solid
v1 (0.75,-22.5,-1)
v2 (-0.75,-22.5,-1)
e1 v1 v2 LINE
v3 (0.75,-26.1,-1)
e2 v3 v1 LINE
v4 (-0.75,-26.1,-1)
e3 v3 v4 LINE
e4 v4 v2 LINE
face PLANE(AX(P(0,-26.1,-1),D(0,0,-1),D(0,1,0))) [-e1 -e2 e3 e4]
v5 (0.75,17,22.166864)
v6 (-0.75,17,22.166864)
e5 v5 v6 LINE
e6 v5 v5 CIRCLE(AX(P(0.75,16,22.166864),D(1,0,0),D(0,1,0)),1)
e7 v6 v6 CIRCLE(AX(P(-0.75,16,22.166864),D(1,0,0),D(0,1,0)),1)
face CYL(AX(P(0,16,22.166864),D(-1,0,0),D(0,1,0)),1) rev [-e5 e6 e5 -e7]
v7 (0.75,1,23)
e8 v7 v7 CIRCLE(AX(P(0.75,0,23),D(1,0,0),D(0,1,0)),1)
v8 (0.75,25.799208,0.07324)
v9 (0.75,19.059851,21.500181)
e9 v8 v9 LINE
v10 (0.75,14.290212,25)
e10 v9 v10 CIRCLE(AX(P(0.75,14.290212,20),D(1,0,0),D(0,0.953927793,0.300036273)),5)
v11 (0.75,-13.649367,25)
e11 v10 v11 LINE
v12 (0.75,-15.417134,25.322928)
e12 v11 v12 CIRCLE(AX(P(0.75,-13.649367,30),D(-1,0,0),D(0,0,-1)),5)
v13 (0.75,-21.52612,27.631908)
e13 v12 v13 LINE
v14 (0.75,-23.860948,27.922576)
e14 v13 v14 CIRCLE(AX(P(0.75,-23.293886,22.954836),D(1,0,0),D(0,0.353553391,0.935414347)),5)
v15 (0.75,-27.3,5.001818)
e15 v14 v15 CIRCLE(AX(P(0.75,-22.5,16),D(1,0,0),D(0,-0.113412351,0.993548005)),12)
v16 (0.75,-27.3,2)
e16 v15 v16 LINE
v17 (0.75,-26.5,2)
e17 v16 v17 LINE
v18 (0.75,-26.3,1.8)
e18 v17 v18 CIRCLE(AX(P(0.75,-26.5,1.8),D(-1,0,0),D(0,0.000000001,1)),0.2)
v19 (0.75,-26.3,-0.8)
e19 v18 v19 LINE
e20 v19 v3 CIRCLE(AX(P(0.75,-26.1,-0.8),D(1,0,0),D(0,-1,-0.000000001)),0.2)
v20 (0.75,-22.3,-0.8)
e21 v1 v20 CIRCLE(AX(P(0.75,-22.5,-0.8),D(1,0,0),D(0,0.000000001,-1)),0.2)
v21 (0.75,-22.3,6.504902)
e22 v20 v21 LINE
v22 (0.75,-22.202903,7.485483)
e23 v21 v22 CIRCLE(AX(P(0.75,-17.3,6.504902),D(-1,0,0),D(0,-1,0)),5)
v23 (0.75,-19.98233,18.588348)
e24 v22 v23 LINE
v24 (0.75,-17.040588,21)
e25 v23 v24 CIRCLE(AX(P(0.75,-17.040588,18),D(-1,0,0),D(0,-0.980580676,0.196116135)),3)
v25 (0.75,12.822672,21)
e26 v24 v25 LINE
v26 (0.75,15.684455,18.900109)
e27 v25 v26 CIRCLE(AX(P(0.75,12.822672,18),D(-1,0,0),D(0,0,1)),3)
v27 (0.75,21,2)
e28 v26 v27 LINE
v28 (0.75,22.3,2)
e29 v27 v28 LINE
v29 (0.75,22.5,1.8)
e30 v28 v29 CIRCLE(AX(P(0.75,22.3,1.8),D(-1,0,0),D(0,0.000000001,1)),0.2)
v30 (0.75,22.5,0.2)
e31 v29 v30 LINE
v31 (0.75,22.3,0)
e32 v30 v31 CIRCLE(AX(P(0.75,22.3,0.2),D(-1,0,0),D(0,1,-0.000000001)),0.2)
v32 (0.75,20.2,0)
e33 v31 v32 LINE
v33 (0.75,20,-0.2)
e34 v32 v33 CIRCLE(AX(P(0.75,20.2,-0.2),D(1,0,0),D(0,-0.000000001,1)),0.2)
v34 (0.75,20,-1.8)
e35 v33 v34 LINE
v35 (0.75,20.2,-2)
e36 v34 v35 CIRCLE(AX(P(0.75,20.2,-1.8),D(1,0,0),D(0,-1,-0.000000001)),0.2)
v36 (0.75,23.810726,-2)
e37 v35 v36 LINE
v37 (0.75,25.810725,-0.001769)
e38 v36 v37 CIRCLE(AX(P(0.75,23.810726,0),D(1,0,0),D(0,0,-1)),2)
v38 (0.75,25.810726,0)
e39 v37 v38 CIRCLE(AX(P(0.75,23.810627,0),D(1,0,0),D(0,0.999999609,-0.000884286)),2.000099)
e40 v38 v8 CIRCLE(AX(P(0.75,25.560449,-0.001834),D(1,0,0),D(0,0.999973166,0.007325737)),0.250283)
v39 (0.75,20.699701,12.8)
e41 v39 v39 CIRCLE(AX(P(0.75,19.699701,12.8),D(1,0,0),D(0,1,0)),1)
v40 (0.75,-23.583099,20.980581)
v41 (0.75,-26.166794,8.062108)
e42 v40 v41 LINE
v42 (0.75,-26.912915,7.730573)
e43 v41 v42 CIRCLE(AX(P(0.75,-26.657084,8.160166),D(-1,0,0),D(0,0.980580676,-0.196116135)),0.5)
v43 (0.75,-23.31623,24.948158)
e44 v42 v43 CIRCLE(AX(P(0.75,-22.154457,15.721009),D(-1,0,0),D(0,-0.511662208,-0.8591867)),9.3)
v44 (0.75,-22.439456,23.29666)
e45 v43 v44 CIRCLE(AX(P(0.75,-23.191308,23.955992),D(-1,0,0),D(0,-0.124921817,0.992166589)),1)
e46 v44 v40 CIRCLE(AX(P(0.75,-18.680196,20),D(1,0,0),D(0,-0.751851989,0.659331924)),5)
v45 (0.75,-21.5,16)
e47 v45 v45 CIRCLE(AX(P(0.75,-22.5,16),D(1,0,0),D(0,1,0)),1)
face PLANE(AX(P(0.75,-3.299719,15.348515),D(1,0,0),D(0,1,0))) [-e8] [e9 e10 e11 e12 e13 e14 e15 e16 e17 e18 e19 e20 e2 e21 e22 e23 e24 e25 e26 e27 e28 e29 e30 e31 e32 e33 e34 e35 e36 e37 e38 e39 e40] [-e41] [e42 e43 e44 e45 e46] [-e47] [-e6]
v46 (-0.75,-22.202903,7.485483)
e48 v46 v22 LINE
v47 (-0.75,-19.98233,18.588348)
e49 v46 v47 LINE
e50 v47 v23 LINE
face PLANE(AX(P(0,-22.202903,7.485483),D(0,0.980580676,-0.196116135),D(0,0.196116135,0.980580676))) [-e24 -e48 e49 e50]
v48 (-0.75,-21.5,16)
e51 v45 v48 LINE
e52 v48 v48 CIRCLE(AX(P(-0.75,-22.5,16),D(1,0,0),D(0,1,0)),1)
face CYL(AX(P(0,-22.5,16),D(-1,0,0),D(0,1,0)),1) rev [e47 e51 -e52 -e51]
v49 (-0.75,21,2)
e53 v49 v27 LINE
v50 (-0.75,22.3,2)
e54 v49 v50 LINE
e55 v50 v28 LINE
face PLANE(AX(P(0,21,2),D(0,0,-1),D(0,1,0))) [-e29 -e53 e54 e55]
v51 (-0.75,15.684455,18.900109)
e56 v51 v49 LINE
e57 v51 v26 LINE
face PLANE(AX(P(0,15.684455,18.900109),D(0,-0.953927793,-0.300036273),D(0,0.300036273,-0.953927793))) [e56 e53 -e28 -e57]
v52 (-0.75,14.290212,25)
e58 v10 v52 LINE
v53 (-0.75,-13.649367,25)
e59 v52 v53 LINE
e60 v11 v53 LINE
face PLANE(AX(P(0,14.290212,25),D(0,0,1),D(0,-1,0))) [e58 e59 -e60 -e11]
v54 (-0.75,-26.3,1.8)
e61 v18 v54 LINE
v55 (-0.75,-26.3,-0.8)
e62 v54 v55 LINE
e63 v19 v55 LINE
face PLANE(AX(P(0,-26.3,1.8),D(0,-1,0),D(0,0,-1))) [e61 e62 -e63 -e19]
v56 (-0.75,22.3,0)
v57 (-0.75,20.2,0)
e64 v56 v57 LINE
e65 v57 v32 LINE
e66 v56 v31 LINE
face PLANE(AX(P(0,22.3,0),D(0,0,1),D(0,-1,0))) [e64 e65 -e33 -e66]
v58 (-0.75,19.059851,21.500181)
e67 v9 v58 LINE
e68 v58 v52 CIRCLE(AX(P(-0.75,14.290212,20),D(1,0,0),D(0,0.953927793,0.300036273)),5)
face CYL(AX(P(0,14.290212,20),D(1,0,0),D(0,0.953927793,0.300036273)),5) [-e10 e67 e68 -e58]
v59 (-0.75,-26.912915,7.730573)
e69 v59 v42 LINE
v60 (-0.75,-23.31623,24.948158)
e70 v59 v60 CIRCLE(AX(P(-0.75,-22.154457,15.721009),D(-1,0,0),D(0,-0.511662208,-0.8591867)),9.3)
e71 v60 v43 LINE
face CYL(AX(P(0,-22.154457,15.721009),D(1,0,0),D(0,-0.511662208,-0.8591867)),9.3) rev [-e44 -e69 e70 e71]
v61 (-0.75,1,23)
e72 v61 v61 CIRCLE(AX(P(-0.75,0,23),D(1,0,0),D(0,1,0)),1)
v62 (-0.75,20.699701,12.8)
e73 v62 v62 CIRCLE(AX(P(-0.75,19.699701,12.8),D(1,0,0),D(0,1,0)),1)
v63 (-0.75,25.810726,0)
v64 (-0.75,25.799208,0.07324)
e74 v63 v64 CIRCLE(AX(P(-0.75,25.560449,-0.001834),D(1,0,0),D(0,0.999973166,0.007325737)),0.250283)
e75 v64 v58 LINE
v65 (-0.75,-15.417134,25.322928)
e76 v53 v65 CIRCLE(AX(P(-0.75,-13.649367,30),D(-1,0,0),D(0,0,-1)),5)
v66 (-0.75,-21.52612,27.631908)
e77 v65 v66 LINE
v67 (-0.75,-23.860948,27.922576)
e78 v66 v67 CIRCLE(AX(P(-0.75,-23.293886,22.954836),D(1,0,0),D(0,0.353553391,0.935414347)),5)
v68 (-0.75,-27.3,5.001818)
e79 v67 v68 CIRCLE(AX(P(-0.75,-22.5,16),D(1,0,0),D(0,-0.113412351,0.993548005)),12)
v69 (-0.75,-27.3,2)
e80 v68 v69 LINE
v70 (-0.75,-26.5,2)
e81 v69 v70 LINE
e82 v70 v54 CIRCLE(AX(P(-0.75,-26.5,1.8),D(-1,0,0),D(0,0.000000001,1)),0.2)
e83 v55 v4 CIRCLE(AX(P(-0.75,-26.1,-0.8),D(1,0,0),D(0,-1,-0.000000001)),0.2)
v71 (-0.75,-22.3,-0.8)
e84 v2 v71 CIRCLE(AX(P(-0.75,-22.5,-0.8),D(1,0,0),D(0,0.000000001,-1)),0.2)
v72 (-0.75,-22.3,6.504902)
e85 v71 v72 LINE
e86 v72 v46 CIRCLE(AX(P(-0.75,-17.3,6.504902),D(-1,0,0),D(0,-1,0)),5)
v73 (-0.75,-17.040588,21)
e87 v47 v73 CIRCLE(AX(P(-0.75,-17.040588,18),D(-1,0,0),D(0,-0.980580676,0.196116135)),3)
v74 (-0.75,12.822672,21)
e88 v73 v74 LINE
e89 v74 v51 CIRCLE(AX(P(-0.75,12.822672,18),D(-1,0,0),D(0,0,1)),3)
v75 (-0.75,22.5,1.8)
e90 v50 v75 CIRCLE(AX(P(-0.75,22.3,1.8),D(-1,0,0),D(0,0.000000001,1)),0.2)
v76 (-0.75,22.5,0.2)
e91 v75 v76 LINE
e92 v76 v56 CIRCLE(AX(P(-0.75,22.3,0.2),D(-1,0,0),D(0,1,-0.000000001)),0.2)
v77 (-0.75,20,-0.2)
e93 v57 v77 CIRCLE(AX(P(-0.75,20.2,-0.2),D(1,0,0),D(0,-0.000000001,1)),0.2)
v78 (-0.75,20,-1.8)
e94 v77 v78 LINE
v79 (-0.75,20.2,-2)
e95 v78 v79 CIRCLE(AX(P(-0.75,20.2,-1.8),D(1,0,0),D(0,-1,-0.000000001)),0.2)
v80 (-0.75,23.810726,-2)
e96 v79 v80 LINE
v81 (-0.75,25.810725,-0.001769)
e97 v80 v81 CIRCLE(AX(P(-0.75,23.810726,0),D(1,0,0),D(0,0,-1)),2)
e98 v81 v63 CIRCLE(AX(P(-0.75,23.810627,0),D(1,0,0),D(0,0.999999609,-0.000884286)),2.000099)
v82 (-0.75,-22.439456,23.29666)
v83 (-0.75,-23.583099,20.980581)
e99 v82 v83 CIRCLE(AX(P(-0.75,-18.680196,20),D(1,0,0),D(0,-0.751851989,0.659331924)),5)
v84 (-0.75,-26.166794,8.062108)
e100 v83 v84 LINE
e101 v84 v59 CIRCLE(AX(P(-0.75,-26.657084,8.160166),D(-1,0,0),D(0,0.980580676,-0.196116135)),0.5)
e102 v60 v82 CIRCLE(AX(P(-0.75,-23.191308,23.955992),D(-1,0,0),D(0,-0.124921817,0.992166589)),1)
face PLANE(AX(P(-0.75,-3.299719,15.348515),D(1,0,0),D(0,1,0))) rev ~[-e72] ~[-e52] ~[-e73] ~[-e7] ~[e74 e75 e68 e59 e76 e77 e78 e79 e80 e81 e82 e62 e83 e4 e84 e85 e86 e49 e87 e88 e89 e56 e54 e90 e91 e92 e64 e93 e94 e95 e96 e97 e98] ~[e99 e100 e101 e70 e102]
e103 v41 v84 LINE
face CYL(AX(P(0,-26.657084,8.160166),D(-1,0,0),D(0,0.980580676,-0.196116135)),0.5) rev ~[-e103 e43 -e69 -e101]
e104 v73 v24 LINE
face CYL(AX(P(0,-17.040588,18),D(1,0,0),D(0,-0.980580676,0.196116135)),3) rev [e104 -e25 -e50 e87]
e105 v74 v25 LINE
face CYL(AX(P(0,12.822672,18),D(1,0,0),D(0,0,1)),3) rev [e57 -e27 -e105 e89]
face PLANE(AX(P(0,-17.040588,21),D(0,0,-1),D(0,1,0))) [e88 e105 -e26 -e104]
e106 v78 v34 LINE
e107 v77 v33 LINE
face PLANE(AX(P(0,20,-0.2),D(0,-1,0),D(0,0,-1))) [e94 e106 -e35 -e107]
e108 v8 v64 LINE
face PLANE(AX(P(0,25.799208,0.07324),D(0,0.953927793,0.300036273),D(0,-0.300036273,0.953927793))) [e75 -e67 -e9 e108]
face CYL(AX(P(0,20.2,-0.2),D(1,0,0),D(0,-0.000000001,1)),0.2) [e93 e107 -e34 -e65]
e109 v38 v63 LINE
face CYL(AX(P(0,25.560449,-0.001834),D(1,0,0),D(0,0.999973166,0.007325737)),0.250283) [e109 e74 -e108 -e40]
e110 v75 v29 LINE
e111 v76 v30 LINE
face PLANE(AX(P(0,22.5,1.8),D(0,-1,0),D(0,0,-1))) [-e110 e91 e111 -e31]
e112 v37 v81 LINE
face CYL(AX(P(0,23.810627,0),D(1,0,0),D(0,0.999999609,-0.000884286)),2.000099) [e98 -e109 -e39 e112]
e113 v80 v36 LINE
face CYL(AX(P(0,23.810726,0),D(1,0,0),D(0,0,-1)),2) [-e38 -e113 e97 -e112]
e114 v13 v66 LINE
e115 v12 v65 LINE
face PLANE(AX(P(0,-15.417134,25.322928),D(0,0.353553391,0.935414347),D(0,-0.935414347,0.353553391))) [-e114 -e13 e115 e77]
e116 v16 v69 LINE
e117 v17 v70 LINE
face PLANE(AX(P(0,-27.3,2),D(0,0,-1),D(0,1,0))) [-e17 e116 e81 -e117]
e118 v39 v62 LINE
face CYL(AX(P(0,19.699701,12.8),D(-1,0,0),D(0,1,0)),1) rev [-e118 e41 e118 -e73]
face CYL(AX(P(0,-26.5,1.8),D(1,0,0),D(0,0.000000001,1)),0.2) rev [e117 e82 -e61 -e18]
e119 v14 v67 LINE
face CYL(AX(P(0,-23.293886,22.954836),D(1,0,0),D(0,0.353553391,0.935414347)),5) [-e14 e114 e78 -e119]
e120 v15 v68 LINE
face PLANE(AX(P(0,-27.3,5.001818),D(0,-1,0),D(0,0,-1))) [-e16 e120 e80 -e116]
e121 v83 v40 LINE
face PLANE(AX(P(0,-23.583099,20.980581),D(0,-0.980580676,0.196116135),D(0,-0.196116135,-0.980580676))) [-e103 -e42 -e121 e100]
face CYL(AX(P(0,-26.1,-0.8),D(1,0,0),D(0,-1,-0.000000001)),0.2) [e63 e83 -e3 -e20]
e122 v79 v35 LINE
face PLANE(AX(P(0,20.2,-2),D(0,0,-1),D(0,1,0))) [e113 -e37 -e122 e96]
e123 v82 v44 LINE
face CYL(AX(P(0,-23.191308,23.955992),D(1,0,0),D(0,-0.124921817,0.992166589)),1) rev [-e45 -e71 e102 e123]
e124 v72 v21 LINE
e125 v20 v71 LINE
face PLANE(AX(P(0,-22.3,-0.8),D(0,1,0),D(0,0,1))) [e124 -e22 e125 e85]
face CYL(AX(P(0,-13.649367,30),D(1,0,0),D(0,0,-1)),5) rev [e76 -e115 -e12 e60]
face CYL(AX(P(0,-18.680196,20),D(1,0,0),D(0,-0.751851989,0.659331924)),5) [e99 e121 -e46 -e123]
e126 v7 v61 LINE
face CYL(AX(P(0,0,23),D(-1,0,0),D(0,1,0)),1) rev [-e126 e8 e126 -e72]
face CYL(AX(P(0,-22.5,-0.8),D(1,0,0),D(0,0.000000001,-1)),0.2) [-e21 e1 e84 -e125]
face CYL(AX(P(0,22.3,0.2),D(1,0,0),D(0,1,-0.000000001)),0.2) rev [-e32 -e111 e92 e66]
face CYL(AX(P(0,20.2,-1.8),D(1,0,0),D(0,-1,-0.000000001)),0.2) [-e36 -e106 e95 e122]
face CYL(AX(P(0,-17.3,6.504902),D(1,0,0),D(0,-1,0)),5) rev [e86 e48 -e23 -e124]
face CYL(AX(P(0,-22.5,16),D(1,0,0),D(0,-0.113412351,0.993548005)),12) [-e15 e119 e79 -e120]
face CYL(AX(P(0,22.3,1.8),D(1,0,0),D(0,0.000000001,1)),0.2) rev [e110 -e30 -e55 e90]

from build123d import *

# Parameters (mm, degrees)
F0_R     = 1
F1_DEPTH = 0.75


# Not quite as in the source:
# - ends of sketch curves that miss each other by under 0.0002 mm in the source are joined
# - a feature names something its author has since deleted; it is built from what else it names


with BuildPart() as f1:
    # F0 (on Right) → F1 (new body, symmetric)
    with BuildSketch(Plane.YZ):
        with BuildLine():
            Line((-22.3, -0.8), (-22.3, 6.504902432))
            ThreePointArc((-22.3, 6.504902432), (-22.2756666333, 6.9975905219), (-22.2029033785, 7.4854831077))
            Line((-22.2029033785, 7.4854831077), (-19.9823303189, 18.5883484054))
            ThreePointArc((-19.9823303189, 18.5883484054), (-18.9425550087, 20.320026424), (-17.0405882918, 21))
            Line((-17.0405882918, 21), (12.8226720923, 21))
            ThreePointArc((12.8226720923, 21), (14.5974500424, 20.4187110675), (15.6844554724, 18.9001088187))
            Line((15.6844554724, 18.9001088187), (21, 2))
            Line((21, 2), (22.3, 2))
            ThreePointArc((22.3, 2), (22.4414213562, 1.9414213562), (22.5, 1.8))
            Line((22.5, 1.8), (22.5, 0.2))
            ThreePointArc((22.5, 0.2), (22.4414213562, 0.0585786438), (22.3, 0))
            Line((22.3, 0), (20.2, 0))
            ThreePointArc((20.2, 0), (20.0585786438, -0.0585786438), (20, -0.2))
            Line((20, -0.2), (20, -1.8))
            ThreePointArc((20, -1.8), (20.0585786438, -1.9414213562), (20.2, -2))
            Line((20.2, -2), (23.8107259146, -2))
            ThreePointArc((23.8107259146, -2), (25.2243140233, -1.4148387396), (25.8107251326, -0.001768659))
            ThreePointArc((25.8107251326, -0.001768659), (25.8107257191, -0.0008843296), (25.8107259146, 0))
            ThreePointArc((25.8107259146, 0), (25.8076938609, 0.0370492941), (25.799207863, 0.0732404086))
            Line((25.799207863, 0.0732404086), (19.059851332, 21.5001813645))
            ThreePointArc((19.059851332, 21.5001813645), (17.2481756153, 24.0311851125), (14.2902123652, 25))
            Line((14.2902123652, 25), (-13.6493669984, 25))
            ThreePointArc((-13.6493669984, 25), (-14.5478772467, 25.0813945743), (-15.4171339514, 25.3229282665))
            Line((-15.4171339514, 25.3229282665), (-21.5261195006, 27.6319077703))
            ThreePointArc((-21.5261195006, 27.6319077703), (-22.6761929546, 27.9165348126), (-23.8609482061, 27.9225760631))
            ThreePointArc((-23.8609482061, 27.9225760631), (-34.3671649706, 17.7805604622), (-27.3, 5.0018183321))
            Line((-27.3, 5.0018183321), (-27.3, 2))
            Line((-27.3, 2), (-26.5, 2))
            ThreePointArc((-26.5, 2), (-26.3585786438, 1.9414213562), (-26.3, 1.8))
            Line((-26.3, 1.8), (-26.3, -0.8))
            ThreePointArc((-26.3, -0.8), (-26.2414213562, -0.9414213562), (-26.1, -1))
            Line((-26.1, -1), (-22.5, -1))
            ThreePointArc((-22.5, -1), (-22.3585786438, -0.9414213562), (-22.3, -0.8))
        make_face()
        with Locations((19.6997005895, 12.8)):
            Circle(F0_R, mode=Mode.SUBTRACT)
        with BuildLine():
            Line((-23.5830994757, 20.9805806757), (-26.1667940449, 8.0621078301))
            ThreePointArc((-26.1667940449, 8.0621078301), (-26.4540531191, 7.7032432499), (-26.9129154865, 7.7305725477))
            ThreePointArc((-26.9129154865, 7.7305725477), (-31.2579507019, 17.6226927508), (-23.3162298506, 24.9481581324))
            ThreePointArc((-23.3162298506, 24.9481581324), (-22.308062771, 24.4249028415), (-22.4394560446, 23.2966596198))
            ThreePointArc((-22.4394560446, 23.2966596198), (-23.1634230366, 22.2137470973), (-23.5830994757, 20.9805806757))
        make_face(mode=Mode.SUBTRACT)
        with Locations((-22.5, 16)):
            Circle(F0_R, mode=Mode.SUBTRACT)
        with Locations((0, 23)):
            Circle(F0_R, mode=Mode.SUBTRACT)
        with Locations((16, 22.1668636565)):
            Circle(F0_R, mode=Mode.SUBTRACT)
    extrude(amount=F1_DEPTH, both=True)


solid = f1.part
